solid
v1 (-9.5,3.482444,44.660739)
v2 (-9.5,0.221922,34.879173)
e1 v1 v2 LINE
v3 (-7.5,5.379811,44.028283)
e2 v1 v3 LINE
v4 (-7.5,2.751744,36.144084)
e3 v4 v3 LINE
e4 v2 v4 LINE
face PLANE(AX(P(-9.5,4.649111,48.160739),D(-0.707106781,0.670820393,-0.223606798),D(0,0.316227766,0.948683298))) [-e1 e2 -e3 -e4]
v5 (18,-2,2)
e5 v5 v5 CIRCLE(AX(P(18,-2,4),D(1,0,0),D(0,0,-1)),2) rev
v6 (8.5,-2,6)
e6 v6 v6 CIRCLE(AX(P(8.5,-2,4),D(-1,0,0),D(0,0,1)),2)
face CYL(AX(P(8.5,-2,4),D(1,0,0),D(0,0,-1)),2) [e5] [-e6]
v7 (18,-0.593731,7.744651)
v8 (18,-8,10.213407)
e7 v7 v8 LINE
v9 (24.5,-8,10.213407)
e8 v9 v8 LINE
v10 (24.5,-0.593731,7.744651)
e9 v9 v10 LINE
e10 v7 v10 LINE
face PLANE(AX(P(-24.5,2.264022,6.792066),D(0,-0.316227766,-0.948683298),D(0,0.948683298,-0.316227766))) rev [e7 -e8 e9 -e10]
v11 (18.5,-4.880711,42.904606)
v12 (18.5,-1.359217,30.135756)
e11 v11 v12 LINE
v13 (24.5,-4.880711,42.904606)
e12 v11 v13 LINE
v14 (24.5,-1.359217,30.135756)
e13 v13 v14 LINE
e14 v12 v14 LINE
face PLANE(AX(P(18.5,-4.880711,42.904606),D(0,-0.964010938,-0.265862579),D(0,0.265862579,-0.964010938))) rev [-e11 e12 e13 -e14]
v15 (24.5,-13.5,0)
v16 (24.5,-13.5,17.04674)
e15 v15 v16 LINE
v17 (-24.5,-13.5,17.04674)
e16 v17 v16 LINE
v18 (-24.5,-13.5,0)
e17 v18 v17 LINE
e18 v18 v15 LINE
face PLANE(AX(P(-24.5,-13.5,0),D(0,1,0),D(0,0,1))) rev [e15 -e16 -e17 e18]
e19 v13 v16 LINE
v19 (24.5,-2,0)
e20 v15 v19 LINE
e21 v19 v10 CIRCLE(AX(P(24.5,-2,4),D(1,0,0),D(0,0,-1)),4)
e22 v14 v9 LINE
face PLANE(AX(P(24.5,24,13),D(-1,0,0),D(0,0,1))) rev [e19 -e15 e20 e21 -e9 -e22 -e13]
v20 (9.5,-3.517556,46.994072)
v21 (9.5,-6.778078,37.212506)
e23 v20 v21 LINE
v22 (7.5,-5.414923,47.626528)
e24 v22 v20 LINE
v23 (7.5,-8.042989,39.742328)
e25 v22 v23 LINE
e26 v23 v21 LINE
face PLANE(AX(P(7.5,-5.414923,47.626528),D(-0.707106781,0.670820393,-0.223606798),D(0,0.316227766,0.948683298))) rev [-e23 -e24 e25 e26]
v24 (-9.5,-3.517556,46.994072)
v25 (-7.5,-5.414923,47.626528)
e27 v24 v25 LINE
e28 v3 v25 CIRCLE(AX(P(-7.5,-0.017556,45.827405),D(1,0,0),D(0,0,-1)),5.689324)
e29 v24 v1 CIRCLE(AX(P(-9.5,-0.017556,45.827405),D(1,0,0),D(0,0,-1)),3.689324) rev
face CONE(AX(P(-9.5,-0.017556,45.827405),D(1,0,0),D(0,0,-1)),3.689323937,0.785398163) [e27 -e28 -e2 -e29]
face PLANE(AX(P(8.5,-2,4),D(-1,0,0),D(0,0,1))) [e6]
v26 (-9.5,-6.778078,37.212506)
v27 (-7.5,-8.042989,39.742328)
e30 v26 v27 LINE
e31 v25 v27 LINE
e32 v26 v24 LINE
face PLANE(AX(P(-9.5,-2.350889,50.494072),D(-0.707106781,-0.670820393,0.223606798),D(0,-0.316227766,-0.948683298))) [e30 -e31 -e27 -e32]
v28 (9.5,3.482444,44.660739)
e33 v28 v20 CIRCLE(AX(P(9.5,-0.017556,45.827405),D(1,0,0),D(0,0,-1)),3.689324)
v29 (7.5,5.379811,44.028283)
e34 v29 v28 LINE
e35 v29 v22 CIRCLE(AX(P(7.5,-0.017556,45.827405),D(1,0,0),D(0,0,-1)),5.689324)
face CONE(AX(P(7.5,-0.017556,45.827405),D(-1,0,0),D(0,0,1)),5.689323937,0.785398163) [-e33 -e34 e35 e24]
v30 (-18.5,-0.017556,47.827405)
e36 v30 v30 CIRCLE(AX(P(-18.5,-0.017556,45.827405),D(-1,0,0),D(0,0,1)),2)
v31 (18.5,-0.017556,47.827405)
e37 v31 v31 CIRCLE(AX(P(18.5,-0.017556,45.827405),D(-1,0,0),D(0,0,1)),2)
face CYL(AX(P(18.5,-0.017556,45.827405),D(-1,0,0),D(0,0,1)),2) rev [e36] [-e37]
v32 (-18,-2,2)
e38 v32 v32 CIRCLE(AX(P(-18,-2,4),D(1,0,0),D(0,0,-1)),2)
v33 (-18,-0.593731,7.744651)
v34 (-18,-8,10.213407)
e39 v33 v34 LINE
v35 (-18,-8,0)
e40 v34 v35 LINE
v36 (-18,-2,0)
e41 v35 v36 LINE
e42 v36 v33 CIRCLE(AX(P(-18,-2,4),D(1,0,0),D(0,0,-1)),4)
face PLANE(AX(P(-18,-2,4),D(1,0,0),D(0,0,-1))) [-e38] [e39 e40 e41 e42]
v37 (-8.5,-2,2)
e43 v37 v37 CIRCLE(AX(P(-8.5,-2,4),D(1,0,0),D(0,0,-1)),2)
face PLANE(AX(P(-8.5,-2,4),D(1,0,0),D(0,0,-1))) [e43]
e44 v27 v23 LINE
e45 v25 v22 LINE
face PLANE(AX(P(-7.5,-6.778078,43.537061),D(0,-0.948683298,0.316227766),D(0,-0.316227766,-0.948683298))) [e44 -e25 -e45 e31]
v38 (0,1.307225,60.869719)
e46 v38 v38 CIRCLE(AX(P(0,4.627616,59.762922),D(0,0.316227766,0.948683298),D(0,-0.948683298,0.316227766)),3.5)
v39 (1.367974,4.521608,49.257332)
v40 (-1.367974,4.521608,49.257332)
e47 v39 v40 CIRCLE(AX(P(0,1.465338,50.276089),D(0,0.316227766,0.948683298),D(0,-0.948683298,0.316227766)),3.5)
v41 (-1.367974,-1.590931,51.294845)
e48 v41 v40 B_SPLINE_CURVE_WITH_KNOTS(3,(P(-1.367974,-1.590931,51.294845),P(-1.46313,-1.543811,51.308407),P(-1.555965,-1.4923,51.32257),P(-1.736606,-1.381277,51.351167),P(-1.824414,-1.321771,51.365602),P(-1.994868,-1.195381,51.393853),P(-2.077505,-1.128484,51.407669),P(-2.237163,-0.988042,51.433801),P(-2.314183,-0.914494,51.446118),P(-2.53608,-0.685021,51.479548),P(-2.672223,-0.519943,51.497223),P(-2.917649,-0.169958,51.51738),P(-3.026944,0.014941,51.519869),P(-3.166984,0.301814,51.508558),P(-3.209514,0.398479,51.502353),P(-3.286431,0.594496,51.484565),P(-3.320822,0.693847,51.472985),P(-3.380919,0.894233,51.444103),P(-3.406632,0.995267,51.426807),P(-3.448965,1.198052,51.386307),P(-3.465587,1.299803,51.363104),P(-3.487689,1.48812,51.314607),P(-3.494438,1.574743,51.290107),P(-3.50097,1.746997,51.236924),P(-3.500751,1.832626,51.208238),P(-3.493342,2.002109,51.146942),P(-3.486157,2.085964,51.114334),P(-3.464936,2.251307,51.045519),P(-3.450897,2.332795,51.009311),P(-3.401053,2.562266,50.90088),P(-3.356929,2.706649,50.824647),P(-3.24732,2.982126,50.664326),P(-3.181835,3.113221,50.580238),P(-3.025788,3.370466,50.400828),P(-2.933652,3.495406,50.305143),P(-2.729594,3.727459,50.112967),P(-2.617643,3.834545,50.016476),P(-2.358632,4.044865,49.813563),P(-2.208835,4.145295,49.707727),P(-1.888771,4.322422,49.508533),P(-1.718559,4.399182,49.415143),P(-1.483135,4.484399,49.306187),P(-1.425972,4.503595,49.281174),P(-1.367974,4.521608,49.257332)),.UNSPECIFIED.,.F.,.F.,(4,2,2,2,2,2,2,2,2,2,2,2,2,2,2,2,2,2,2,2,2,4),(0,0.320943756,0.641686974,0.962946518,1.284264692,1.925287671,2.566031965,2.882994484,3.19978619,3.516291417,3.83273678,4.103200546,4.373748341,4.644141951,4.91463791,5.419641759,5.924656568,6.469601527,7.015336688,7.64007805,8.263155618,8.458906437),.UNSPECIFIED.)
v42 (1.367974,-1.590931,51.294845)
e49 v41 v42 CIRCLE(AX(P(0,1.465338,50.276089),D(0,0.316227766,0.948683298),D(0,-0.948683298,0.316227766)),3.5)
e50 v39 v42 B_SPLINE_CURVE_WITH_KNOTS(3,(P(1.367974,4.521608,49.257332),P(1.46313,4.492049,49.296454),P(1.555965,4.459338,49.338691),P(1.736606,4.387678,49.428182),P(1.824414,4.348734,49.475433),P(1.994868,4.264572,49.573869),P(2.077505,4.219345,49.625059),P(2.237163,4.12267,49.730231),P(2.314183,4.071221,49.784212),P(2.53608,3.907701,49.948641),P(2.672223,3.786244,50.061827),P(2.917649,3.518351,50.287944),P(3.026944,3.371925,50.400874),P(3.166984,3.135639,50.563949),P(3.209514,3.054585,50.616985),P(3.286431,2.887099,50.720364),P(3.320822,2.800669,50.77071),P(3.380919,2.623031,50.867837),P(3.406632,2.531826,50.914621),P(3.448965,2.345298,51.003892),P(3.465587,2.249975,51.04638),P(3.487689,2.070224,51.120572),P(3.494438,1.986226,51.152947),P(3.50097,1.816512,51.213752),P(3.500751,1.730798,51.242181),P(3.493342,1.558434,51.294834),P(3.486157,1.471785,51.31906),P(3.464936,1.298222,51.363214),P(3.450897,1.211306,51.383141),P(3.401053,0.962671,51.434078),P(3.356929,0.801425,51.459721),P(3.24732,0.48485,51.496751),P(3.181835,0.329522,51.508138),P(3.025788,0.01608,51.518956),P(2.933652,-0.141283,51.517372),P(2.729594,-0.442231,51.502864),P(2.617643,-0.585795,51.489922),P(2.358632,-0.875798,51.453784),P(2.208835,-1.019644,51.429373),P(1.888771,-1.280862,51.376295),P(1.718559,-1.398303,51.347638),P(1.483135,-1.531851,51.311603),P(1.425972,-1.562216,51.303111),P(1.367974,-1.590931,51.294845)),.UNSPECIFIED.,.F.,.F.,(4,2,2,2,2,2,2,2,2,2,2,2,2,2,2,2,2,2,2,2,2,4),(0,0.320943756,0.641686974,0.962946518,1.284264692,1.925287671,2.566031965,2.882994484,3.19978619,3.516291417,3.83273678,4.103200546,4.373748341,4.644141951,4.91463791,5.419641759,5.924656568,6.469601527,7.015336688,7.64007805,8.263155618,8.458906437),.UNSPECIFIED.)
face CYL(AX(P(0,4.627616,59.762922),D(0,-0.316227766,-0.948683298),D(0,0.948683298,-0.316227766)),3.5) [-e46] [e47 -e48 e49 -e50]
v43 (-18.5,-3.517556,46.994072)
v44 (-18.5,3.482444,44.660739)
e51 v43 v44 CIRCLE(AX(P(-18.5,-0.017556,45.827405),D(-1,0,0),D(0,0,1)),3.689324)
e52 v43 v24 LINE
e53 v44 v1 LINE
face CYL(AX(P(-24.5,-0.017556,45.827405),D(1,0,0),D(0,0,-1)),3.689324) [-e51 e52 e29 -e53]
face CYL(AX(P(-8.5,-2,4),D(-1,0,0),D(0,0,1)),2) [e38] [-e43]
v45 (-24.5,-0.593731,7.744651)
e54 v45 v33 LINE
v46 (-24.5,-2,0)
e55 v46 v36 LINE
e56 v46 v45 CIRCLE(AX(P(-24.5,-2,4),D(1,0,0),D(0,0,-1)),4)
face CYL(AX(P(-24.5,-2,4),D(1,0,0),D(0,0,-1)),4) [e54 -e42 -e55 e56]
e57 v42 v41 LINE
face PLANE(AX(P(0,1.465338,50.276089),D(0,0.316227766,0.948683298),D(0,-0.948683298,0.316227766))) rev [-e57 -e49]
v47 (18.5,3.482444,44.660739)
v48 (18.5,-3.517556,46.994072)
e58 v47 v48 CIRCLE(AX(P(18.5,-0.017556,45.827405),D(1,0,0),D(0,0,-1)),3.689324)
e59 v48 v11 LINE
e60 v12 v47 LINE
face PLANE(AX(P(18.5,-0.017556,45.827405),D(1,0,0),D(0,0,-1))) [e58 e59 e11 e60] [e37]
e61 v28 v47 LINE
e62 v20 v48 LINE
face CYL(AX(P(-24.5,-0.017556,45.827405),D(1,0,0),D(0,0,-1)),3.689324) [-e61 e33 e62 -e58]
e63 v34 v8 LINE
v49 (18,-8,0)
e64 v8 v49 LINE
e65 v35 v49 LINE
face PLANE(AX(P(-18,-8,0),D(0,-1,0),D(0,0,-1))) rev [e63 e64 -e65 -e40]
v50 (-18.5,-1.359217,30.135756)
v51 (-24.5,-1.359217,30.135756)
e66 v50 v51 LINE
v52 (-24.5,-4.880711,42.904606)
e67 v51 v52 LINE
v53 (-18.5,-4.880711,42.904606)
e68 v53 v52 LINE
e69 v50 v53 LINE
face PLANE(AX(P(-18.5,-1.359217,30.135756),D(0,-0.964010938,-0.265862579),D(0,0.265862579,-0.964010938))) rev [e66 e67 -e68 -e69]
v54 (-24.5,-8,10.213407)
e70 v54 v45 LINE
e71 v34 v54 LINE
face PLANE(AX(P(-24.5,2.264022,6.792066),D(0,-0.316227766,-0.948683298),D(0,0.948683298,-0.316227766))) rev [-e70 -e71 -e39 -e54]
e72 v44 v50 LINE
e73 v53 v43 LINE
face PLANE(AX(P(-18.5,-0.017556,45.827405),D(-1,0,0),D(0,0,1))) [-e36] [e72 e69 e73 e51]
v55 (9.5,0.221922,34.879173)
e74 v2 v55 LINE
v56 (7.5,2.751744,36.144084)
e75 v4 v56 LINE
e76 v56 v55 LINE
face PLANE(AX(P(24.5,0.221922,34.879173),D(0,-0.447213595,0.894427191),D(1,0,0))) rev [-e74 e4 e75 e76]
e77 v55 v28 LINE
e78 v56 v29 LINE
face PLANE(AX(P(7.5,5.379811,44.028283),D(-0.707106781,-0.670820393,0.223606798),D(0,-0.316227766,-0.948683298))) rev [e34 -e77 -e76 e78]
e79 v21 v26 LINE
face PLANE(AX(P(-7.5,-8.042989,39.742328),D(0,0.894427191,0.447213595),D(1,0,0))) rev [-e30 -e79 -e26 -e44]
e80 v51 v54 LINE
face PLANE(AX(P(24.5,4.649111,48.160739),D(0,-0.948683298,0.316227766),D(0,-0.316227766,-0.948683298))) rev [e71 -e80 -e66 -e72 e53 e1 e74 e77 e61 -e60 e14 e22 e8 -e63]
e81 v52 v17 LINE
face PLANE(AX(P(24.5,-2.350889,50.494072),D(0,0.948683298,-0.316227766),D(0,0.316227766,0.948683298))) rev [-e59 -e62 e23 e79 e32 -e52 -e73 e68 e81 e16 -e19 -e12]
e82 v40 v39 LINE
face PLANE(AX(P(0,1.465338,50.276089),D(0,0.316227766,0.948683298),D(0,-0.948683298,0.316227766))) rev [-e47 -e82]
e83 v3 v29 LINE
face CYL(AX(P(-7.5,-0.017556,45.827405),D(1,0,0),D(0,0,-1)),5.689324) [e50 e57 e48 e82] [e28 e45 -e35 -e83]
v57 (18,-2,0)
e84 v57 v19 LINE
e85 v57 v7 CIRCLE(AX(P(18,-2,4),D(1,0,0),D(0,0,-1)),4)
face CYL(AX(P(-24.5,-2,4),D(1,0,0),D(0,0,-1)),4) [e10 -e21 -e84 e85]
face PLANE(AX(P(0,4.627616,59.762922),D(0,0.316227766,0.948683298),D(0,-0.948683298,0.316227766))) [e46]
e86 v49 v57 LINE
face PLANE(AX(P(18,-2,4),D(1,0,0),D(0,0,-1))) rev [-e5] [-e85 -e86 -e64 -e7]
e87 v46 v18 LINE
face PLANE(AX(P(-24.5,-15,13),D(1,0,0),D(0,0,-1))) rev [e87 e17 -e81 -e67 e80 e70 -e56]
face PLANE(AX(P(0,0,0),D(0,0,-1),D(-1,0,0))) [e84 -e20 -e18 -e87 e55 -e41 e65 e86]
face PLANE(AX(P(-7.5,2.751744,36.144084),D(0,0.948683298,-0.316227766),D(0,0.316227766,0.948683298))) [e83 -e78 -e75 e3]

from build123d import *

# Parameters (mm, degrees)
BOSS_EXTRUDE1_DEPTH = 13
CHAMFER1_SIZE       = 39
CHAMFER1_SIZE_2     = 13
CUT_EXTRUDE1_DEPTH  = 49
CUT_EXTRUDE2_DEPTH  = 49
CUT_EXTRUDE3_DEPTH  = 36
SKETCH5_R           = 2
BOSS_EXTRUDE2_DEPTH = 9.5
BOSS_EXTRUDE3_START = 9.5
SKETCH7_R           = 2
BOSS_EXTRUDE3_DEPTH = 9.5
SKETCH8_W           = 49
SKETCH8_H           = 7.378647874
BOSS_EXTRUDE4_DEPTH = 40
CUT_EXTRUDE4_DEPTH  = 49
CUT_EXTRUDE5_DEPTH  = 6
CUT_EXTRUDE6_START  = -6
CUT_EXTRUDE6_DEPTH  = 6
SKETCH12_R          = 2
CUT_EXTRUDE7_DEPTH  = 37
BOSS_EXTRUDE5_DEPTH = 15
CHAMFER2_SIZE       = 2
BOSS_EXTRUDE6_START = -1
SKETCH14_R          = 3.5
BOSS_EXTRUDE6_DEPTH = 10
SKETCH16_W          = 17.046740202
SKETCH16_H          = 1.5
CUT_EXTRUDE8_DEPTH  = 49


# Some blends are built 0.0001 mm under size
with BuildPart() as part:
    # Sketch1 → Boss-Extrude1 (new body)
    with BuildSketch(Plane.XY):
        Polygon((0, -15), (24.5, -15), (24.5, 24), (-24.5, 24), (-24.5, -15), align=None)
    extrude(amount=BOSS_EXTRUDE1_DEPTH)

    # Chamfer1
    # the kernel refuses this chamfer: 39, 13 mm, written as the material it takes off along each edge
    with BuildSketch(Plane(origin=(125.707379416, 24, 13), x_dir=(0, -0.9999257509361695, 0.012185754582199166), z_dir=(-1, 0, 0))) as chamfer1_piece_1:
        Polygon((CHAMFER1_SIZE * 0.999925750936, -CHAMFER1_SIZE * 0.0121857545822), (-CHAMFER1_SIZE_2 * 0.0121857545822, -CHAMFER1_SIZE_2 * 0.999925750936), (0, 0), align=None)
    extrude(amount=251.414758831, mode=Mode.SUBTRACT)

    # Sketch2 → Cut-Extrude1 (cut)
    with BuildSketch(Plane(origin=(24.5, 0, 0), x_dir=(0, 0, -1), z_dir=(1, 0, 0))):
        Polygon((0, 2), (-7.333333333, 2), (0, 24), align=None)
    extrude(amount=-CUT_EXTRUDE1_DEPTH, mode=Mode.SUBTRACT)

    # Sketch3 → Cut-Extrude2 (cut)
    with BuildSketch(Plane(origin=(24.5, 0, 0), x_dir=(0, 0, -1), z_dir=(1, 0, 0))):
        with BuildLine():
            Line((-7.333333333, 2), (-13, -15))
            Line((-13, -15), (-12.546740202, -15))
            Line((-12.546740202, -15), (-7.744650675, -0.593731419))
            ThreePointArc((-7.744650675, -0.593731419), (-6.277600237, 1.28824226), (-4, 2))
            Line((-4, 2), (-7.333333333, 2))
        make_face()
        with BuildLine():
            Line((0, 2), (-4, 2))
            ThreePointArc((-4, 2), (-1.171572875, 0.828427125), (0, -2))
            Line((0, -2), (0, 2))
        make_face()
    extrude(amount=-CUT_EXTRUDE2_DEPTH, mode=Mode.SUBTRACT)

    # Sketch4 → Cut-Extrude3 (cut)
    with BuildSketch(Plane(origin=(18, 0, 0), x_dir=(0, 0, -1), z_dir=(1, 0, 0))):
        with BuildLine():
            Line((0, -8), (-10.213406869, -8))
            Line((-10.213406869, -8), (-7.744650675, -0.593731419))
            ThreePointArc((-7.744650675, -0.593731419), (-3.285368172, 1.935644973), (0, -2))
            Line((0, -2), (0, -8))
        make_face()
    extrude(amount=-CUT_EXTRUDE3_DEPTH, mode=Mode.SUBTRACT)

    # Sketch5 → Boss-Extrude2 (add)
    with BuildSketch(Plane.ZY.offset(-18)):
        with Locations(Location((4, -2, 0), (0, 0, 180))):
            Circle(SKETCH5_R)
    extrude(amount=BOSS_EXTRUDE2_DEPTH)

    # Sketch7 → Boss-Extrude3 (add)
    with BuildSketch(Plane(origin=(-18, 0, 0), x_dir=(0, 0, -1), z_dir=(1, 0, 0)).offset(BOSS_EXTRUDE3_START)):
        with Locations((-4, -2)):
            Circle(SKETCH7_R)
    extrude(amount=-BOSS_EXTRUDE3_DEPTH)

    # Sketch8 → Boss-Extrude4 (add)
    with BuildSketch(Plane(origin=(0, 2.264022061, 6.792066182), x_dir=(1, 0, 0), z_dir=(0, 0.31622776601683816, 0.9486832980505138))):
        with Locations((0, -14.508553159)):
            Rectangle(SKETCH8_W, SKETCH8_H)
    extrude(amount=BOSS_EXTRUDE4_DEPTH)

    # Sketch9 → Cut-Extrude4 (cut)
    with BuildSketch(Plane(origin=(24.5, 0, 0), x_dir=(0, 0, -1), z_dir=(1, 0, 0))):
        with BuildLine():
            ThreePointArc((-46.994072124, -3.517556026), (-49.127237075, -1.667471905), (-49.327405497, 1.149110522))
            Line((-49.327405497, 1.149110522), (-50.494072124, -2.350889359))
            Line((-50.494072124, -2.350889359), (-46.994072124, -3.517556026))
        make_face()
        with BuildLine():
            ThreePointArc((-49.327405497, 1.149110522), (-47.477321336, 3.282275592), (-44.660738791, 3.482443974))
            Line((-44.660738791, 3.482443974), (-48.160738791, 4.649110641))
            Line((-48.160738791, 4.649110641), (-49.327405497, 1.149110522))
        make_face()
    extrude(amount=-CUT_EXTRUDE4_DEPTH, mode=Mode.SUBTRACT)

    # Sketch10 → Cut-Extrude5 (cut)
    with BuildSketch(Plane(origin=(24.5, 0, 0), x_dir=(0, 0, -1), z_dir=(1, 0, 0))):
        with BuildLine():
            Line((-42.90460574, -4.880711487), (-30.135756128, -1.359216914))
            Line((-30.135756128, -1.359216914), (-44.660738791, 3.482443974))
            ThreePointArc((-44.660738791, 3.482443974), (-49.327405457, 1.149110641), (-46.994072124, -3.517556026))
            Line((-46.994072124, -3.517556026), (-42.90460574, -4.880711487))
        make_face()
    extrude(amount=-CUT_EXTRUDE5_DEPTH, mode=Mode.SUBTRACT)

    # Sketch11 → Cut-Extrude6 (cut)
    with BuildSketch(Plane.ZY.offset(24.5).offset(CUT_EXTRUDE6_START)):
        with BuildLine():
            Line((30.135756128, -1.359216914), (42.90460574, -4.880711487))
            Line((42.90460574, -4.880711487), (46.994072124, -3.517556026))
            ThreePointArc((46.994072124, -3.517556026), (49.327405457, 1.149110641), (44.660738791, 3.482443974))
            Line((44.660738791, 3.482443974), (30.135756128, -1.359216914))
        make_face()
    extrude(amount=CUT_EXTRUDE6_DEPTH, mode=Mode.SUBTRACT)

    # Sketch12 → Cut-Extrude7 (cut)
    with BuildSketch(Plane.ZY.offset(18.5)):
        with Locations((45.827405457, -0.017556026)):
            Circle(SKETCH12_R)
    extrude(amount=-CUT_EXTRUDE7_DEPTH, mode=Mode.SUBTRACT)

    # Sketch13 → Boss-Extrude5 (add)
    with BuildSketch(Plane(origin=(7.5, 0, 0), x_dir=(0, 0, -1), z_dir=(1, 0, 0))):
        with BuildLine():
            Line((-36.144083682, 2.751744045), (-44.028283259, 5.37981057))
            ThreePointArc((-44.028283259, 5.37981057), (-51.224772053, 1.781566173), (-47.626527656, -5.414922622))
            Line((-47.626527656, -5.414922622), (-43.537061272, -6.778078084))
            Line((-43.537061272, -6.778078084), (-39.742328079, -8.042989148))
            Line((-39.742328079, -8.042989148), (-39.109872547, -6.145622552))
            Line((-39.109872547, -6.145622552), (-42.90460574, -4.880711487))
            Line((-42.90460574, -4.880711487), (-46.994072124, -3.517556026))
            ThreePointArc((-46.994072124, -3.517556026), (-49.327405457, 1.149110641), (-44.660738791, 3.482443974))
            Line((-44.660738791, 3.482443974), (-36.776539214, 0.854377448))
            Line((-36.776539214, 0.854377448), (-36.144083682, 2.751744045))
        make_face()
    extrude(amount=-BOSS_EXTRUDE5_DEPTH)

    # Chamfer2
    chamfer2_edges = [part.edges().sort_by_distance(p)[0] for p in [
        (0, 0.854377448, 36.776539214),
        (-7.5, 2.168410711, 40.718639002),
        (7.5, 2.168410711, 40.718639002),
        (-7.5, 1.149110641, 49.327405457),
        (7.5, 1.149110641, 49.327405457),
        (-7.5, -4.831589289, 43.051972336),
        (0, -6.145622552, 39.109872547),
        (7.5, -4.831589289, 43.051972336),
    ]]
    chamfer(chamfer2_edges, length=CHAMFER2_SIZE - 0.0001)  # a hair under: the kernel refuses the full size

    # Sketch14 → Boss-Extrude6 (add)
    with BuildSketch(Plane(origin=(-7.5, 1.781566173, 51.224772053), x_dir=(1, 0, 0), z_dir=(0, 0.31622776601683844, 0.9486832980505138)).offset(BOSS_EXTRUDE6_START)):
        with Locations(Location((7.5, 0, 0), (0, 0, 66.99262336))):
            Circle(SKETCH14_R)
    extrude(amount=BOSS_EXTRUDE6_DEPTH)

    # Sketch16 → Cut-Extrude8 (cut)
    with BuildSketch(Plane(origin=(24.5, 0, 0), x_dir=(0, 0, -1), z_dir=(1, 0, 0))):
        with Locations((-8.523370101, -14.25)):
            Rectangle(SKETCH16_W, SKETCH16_H)
    extrude(amount=-CUT_EXTRUDE8_DEPTH, mode=Mode.SUBTRACT)


solid = part.part
